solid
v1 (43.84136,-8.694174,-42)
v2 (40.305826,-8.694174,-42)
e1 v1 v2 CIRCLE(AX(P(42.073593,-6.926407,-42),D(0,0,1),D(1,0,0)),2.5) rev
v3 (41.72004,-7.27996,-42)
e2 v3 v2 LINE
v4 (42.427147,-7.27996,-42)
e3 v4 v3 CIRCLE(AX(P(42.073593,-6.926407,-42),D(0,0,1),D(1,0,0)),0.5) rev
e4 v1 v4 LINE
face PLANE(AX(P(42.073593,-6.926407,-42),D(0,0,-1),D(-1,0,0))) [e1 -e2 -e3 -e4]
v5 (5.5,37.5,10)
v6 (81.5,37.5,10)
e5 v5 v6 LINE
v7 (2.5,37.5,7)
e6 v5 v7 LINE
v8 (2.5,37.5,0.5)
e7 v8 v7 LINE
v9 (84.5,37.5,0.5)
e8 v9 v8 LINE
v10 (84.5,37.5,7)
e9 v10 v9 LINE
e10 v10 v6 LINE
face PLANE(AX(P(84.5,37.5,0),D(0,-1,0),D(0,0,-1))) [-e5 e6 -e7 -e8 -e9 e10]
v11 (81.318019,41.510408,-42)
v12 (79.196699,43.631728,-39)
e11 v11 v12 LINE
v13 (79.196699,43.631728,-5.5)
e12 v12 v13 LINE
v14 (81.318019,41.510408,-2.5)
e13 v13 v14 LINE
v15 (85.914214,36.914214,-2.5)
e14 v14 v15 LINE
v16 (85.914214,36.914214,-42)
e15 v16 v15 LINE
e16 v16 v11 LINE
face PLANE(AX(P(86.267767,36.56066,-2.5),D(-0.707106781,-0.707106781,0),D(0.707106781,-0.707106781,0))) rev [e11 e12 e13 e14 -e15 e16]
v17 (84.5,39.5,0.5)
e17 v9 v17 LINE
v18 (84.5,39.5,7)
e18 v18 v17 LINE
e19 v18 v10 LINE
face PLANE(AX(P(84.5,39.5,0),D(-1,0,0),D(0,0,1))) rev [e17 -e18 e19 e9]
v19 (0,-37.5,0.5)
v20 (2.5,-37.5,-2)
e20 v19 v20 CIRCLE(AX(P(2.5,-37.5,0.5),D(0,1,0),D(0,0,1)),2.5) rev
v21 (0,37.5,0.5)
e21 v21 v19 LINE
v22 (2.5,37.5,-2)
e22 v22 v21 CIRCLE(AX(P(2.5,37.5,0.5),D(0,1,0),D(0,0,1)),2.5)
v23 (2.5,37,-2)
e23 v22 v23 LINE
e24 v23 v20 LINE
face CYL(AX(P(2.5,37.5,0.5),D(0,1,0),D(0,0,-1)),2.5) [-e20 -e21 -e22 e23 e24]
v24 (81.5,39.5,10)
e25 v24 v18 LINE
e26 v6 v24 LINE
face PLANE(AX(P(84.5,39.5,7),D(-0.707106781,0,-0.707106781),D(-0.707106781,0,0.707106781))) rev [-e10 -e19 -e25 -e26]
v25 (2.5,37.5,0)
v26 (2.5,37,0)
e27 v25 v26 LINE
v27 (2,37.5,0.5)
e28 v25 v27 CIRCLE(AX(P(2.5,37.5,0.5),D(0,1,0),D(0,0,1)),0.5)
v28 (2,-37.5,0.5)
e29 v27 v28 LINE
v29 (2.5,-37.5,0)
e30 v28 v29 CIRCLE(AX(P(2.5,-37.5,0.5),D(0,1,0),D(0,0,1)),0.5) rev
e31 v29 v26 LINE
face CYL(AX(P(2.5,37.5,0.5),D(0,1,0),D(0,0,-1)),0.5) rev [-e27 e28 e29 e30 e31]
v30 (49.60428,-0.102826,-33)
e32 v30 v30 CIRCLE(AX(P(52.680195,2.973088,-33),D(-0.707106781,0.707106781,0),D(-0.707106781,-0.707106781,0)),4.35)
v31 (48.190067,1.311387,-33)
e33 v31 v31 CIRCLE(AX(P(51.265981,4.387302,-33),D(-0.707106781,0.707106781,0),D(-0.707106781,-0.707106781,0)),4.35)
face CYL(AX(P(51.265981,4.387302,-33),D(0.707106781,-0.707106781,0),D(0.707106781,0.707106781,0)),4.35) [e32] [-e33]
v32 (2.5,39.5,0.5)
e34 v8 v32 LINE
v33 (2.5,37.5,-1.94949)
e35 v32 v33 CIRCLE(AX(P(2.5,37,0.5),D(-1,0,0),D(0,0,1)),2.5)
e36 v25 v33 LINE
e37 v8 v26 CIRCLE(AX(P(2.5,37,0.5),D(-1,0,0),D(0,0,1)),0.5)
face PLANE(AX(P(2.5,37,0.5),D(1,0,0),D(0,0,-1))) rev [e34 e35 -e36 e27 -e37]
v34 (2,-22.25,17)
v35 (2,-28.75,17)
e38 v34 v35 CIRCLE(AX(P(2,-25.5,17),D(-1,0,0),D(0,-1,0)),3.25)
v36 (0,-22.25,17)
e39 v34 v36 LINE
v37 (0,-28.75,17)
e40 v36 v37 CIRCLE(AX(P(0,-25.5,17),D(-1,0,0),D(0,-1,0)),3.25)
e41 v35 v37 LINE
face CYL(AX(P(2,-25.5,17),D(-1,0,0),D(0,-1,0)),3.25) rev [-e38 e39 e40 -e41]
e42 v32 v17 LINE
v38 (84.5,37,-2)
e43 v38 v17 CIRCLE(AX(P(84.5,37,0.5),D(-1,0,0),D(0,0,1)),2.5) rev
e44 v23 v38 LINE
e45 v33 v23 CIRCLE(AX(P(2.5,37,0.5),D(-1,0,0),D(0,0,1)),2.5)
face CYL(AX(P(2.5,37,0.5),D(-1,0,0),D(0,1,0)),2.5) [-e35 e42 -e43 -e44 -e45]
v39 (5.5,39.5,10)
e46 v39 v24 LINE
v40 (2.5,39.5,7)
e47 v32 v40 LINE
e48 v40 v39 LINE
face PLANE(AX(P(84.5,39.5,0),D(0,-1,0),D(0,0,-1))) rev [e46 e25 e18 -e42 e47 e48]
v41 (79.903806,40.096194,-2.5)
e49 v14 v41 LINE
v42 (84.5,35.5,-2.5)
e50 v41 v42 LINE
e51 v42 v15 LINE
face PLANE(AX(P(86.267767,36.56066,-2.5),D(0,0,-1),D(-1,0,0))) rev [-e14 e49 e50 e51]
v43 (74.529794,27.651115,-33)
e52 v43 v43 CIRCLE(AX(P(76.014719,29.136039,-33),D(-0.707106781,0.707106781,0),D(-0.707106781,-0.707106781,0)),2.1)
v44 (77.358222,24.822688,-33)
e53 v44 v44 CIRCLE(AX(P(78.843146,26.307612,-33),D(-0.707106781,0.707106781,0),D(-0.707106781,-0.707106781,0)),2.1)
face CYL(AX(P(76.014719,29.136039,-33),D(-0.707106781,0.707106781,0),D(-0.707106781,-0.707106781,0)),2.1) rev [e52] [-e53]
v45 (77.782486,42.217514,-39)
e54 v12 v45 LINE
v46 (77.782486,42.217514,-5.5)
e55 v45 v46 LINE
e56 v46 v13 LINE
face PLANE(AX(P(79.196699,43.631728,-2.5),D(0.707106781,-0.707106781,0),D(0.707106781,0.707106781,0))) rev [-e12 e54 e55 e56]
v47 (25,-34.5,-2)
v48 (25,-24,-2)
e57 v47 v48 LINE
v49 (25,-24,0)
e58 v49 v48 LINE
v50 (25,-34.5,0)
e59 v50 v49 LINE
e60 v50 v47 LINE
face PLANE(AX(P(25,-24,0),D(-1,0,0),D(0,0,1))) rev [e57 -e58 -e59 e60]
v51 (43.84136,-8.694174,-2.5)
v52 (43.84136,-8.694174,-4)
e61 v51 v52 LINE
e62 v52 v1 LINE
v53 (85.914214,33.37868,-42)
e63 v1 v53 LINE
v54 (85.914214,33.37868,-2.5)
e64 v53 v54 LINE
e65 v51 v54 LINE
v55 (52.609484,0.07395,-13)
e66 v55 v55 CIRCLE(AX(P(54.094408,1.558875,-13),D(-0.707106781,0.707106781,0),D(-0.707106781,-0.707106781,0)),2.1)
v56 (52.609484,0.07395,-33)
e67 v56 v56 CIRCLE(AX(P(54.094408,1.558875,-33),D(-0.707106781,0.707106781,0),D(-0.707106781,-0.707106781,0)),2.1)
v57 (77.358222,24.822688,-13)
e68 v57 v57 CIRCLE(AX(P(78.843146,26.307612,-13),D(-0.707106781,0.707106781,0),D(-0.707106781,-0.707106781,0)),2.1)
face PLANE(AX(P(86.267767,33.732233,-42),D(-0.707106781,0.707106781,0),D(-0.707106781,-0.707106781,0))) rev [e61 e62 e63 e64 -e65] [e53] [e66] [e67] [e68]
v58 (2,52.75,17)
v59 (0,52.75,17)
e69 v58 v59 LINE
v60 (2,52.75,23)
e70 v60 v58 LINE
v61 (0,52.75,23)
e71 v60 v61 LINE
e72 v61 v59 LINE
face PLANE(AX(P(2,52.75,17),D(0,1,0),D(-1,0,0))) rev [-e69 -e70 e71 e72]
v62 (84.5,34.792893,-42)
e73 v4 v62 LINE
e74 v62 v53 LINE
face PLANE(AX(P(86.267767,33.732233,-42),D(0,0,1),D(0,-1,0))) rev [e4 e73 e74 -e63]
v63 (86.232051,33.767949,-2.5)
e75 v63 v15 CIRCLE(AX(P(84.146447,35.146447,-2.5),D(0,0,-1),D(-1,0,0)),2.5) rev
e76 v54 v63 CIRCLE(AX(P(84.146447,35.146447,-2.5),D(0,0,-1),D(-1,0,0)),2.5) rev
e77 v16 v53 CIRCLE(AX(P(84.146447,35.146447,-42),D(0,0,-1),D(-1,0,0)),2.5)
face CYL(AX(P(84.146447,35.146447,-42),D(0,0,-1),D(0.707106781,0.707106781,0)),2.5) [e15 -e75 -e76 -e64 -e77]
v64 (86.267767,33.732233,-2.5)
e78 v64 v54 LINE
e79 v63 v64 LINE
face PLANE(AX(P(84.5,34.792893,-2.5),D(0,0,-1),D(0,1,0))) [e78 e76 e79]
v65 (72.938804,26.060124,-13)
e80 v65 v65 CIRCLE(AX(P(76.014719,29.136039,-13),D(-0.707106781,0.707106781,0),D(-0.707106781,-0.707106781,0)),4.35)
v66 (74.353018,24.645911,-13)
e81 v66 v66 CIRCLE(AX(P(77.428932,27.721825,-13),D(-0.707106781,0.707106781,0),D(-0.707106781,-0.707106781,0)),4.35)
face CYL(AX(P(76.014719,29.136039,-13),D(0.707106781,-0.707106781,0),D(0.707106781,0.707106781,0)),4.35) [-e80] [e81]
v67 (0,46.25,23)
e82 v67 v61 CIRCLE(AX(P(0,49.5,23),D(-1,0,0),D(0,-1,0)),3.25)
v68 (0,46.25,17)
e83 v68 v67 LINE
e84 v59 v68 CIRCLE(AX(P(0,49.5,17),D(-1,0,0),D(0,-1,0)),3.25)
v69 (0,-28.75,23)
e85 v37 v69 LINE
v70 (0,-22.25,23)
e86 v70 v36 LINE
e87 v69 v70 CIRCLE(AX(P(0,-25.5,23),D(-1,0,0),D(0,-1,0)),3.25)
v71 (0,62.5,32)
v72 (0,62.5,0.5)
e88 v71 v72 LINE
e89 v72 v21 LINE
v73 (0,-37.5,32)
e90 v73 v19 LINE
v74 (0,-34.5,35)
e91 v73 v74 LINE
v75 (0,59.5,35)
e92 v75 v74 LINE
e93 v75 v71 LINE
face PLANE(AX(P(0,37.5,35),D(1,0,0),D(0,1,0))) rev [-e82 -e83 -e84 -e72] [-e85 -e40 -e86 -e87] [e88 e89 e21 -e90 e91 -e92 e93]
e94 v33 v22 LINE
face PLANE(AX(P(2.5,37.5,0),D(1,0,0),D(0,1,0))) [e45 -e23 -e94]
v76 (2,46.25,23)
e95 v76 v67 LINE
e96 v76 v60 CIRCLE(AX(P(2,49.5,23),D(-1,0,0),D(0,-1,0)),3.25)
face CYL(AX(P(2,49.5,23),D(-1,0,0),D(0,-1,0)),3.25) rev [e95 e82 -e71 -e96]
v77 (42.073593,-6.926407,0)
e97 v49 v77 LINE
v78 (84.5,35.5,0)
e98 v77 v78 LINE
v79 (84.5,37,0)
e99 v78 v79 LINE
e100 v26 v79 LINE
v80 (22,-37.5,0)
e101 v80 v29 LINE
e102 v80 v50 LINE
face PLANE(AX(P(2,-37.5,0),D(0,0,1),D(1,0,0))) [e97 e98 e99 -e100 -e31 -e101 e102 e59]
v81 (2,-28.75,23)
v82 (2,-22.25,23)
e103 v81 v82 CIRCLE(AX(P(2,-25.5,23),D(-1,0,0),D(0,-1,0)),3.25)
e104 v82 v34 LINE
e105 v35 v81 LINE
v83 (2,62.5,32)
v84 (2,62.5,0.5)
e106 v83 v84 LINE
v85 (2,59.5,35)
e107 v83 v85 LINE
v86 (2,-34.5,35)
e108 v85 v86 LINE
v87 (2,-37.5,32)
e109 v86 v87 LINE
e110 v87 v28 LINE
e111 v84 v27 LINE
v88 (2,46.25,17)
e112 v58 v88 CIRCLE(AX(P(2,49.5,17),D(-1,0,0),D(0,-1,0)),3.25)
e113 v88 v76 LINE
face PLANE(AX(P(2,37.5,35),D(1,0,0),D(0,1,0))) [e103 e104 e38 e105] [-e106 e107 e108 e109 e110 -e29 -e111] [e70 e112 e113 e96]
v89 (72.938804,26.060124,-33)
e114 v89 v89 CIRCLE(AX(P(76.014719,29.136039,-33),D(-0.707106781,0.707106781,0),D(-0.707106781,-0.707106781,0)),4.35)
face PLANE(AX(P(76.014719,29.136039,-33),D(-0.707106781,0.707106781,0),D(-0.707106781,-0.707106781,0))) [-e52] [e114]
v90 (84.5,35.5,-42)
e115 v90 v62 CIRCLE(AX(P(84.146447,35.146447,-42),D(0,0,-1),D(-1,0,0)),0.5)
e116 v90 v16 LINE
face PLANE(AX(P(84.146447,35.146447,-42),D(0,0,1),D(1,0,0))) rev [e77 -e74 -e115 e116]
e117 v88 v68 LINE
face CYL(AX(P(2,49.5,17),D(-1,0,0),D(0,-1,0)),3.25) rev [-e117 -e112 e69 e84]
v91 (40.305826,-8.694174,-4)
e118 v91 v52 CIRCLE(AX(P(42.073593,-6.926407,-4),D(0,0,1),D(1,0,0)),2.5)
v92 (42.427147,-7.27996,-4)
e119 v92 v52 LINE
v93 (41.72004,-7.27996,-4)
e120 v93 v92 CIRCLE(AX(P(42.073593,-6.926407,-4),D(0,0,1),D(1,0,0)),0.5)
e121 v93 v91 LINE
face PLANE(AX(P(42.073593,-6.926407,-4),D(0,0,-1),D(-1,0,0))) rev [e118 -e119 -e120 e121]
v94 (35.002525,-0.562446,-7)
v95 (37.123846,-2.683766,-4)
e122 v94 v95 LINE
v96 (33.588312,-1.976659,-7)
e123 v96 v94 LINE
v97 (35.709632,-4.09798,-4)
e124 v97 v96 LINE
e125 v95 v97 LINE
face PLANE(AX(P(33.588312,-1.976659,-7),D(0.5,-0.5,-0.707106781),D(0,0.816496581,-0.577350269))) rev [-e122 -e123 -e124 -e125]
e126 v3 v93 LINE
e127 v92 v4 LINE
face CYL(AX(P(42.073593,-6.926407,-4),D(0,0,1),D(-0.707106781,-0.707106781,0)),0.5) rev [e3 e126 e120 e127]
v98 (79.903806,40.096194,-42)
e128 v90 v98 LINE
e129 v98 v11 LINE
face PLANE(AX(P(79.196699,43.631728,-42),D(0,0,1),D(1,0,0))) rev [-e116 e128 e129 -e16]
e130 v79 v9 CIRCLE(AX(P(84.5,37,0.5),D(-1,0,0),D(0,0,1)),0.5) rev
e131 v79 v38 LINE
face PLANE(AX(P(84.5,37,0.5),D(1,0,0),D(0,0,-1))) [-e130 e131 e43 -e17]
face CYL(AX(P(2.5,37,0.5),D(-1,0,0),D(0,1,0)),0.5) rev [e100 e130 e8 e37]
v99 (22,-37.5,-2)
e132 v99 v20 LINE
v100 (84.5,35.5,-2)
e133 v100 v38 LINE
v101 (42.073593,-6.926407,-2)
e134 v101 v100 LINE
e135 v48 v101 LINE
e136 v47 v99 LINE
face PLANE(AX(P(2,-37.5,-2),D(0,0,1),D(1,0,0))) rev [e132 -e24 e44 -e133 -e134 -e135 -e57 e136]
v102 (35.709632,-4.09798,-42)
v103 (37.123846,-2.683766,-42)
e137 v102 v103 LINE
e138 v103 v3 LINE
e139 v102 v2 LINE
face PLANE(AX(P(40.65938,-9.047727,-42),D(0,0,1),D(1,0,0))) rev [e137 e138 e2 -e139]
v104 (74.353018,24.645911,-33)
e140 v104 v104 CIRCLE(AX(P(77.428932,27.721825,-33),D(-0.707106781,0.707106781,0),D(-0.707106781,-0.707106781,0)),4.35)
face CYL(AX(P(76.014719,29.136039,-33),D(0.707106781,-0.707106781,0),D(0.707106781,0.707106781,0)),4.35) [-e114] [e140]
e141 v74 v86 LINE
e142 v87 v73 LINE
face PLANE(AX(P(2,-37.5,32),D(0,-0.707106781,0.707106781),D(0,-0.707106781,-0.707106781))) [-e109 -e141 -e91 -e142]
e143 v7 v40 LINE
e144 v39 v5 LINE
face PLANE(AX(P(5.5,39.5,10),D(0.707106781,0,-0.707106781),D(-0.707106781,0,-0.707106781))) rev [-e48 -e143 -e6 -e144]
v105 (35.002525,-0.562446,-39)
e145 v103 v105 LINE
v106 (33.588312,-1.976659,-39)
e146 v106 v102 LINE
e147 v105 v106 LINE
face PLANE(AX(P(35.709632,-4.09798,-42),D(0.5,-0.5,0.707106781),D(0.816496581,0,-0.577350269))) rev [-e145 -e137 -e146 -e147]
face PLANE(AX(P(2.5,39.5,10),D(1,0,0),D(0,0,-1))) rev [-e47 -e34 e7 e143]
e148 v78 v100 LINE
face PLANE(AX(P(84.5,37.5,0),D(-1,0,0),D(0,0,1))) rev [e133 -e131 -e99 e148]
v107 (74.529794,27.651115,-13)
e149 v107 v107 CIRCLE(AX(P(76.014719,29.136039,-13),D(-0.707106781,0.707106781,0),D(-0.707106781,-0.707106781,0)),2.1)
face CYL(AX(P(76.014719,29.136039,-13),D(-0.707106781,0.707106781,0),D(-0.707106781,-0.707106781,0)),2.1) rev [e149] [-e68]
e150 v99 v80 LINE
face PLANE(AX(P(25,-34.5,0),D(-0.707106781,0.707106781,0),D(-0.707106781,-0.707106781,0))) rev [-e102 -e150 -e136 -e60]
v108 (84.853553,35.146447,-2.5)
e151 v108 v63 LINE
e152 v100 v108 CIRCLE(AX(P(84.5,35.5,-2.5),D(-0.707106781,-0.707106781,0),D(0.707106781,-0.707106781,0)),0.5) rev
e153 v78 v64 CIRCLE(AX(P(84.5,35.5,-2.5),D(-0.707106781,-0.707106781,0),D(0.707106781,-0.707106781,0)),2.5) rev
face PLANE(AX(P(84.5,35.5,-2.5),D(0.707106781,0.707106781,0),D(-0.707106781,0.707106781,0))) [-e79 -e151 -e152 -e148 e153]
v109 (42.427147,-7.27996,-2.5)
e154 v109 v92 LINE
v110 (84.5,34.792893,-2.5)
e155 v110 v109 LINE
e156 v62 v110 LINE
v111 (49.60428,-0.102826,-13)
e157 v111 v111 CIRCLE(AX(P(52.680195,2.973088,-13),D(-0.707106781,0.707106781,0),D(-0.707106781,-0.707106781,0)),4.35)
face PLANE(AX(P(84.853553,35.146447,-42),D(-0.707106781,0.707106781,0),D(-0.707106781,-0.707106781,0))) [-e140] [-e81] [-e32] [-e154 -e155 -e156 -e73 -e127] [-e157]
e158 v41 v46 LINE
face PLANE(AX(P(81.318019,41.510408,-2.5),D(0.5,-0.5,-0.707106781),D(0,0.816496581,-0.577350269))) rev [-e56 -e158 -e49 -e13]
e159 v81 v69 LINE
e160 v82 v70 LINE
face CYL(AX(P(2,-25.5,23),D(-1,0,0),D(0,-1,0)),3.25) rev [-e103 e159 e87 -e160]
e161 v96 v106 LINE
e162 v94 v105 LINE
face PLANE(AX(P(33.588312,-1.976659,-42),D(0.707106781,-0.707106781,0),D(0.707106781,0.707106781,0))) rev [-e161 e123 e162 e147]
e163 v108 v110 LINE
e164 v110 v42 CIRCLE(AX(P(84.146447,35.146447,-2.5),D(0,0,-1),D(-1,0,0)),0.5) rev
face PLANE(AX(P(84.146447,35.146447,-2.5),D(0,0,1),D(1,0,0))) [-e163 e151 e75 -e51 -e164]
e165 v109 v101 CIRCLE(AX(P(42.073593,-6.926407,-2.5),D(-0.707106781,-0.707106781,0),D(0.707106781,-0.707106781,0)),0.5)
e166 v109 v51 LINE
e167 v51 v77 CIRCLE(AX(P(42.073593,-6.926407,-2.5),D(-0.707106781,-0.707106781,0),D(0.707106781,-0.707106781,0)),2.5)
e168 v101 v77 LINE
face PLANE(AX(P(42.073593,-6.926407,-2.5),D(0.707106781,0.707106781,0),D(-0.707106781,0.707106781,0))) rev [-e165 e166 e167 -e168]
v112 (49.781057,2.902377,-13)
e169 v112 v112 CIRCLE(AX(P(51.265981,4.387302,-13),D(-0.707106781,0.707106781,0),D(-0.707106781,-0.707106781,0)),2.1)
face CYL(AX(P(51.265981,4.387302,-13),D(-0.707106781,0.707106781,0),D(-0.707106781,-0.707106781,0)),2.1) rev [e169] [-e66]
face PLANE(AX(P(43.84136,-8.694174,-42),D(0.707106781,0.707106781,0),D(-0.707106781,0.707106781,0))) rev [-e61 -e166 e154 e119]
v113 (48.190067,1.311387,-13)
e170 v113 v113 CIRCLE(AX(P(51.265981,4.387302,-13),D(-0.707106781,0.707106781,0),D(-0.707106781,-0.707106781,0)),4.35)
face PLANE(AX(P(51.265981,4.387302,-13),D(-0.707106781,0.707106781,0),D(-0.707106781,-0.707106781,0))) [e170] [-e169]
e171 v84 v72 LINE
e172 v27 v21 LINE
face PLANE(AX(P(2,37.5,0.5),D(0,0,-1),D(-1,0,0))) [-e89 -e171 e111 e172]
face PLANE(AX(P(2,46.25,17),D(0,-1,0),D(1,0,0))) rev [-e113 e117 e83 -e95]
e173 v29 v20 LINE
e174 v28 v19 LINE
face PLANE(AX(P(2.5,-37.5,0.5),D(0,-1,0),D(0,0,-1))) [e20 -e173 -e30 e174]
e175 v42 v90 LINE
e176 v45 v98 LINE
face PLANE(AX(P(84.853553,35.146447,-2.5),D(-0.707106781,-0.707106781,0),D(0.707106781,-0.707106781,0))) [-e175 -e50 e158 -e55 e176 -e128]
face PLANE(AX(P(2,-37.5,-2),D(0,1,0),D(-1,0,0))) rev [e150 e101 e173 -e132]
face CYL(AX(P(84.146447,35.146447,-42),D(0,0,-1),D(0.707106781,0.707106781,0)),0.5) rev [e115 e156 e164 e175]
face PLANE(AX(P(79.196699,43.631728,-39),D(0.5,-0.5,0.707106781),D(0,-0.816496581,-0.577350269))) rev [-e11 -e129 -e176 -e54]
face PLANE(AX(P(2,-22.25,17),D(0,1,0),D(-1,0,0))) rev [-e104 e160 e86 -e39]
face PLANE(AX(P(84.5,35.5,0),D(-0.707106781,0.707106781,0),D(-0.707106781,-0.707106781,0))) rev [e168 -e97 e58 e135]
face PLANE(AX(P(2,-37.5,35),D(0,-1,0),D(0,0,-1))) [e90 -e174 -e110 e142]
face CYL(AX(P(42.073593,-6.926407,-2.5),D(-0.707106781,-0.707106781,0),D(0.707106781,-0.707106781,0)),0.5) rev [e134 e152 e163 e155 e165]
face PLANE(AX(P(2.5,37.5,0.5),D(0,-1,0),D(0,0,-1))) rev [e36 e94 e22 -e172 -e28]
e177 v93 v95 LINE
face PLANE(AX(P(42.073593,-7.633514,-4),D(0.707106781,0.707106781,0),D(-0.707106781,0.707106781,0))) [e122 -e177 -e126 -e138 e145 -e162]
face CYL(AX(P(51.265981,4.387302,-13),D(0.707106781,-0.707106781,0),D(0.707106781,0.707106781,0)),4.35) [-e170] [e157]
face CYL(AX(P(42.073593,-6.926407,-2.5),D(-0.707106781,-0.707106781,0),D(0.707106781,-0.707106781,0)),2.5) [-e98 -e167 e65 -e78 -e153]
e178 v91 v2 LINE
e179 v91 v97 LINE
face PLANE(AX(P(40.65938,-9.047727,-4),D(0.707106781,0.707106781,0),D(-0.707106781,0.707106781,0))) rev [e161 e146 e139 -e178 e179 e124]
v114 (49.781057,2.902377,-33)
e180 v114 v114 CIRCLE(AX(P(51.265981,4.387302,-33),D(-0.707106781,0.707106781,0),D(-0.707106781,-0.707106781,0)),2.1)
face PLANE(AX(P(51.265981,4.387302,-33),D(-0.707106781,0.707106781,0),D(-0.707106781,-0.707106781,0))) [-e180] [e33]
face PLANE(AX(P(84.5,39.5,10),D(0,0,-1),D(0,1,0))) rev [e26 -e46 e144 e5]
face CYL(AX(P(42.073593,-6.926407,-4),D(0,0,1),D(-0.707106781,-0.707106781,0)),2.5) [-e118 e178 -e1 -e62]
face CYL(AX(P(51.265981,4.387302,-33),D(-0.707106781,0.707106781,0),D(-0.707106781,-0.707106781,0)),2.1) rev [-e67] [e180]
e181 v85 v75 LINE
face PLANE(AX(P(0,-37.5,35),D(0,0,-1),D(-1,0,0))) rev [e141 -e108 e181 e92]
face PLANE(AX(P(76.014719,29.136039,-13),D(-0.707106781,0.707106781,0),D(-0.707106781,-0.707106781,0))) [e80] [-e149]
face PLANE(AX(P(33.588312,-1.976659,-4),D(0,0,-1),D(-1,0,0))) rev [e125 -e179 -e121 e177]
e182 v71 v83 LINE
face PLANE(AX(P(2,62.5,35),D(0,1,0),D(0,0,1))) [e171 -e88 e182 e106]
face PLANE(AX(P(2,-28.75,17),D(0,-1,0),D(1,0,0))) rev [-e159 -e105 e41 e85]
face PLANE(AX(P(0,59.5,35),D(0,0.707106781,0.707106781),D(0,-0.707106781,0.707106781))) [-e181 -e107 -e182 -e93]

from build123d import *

# Parameters (mm, degrees)
SKETCH_1_W                       = 2
SKETCH_1_H                       = 75
SM_BASE_FLANGE_1_DEPTH           = 35
SM_EDGE_FLANGE_1_STRIP_W         = 9
SM_EDGE_FLANGE_1_STRIP_H         = 2
SM_EDGE_FLANGE_1_STRIP_CUT_DEPTH = 75
SM_EDGE_FLANGE_1_DEPTH           = 75
CUT_EXTRUDE_1_DEPTH              = 2
SM_EDGE_FLANGE_2_DEPTH           = 60
SM_EDGE_FLANGE_3_STRIP_W         = 9
SM_EDGE_FLANGE_3_STRIP_H         = 2
SM_EDGE_FLANGE_3_STRIP_CUT_DEPTH = 39.5
SM_EDGE_FLANGE_3_DEPTH           = 39.5
SM_EDGE_FLANGE_4_STRIP_W         = 9
SM_EDGE_FLANGE_4_STRIP_H         = 2
SM_EDGE_FLANGE_4_STRIP_CUT_DEPTH = 82
SM_EDGE_FLANGE_4_DEPTH           = 82
SM_EDGE_FLANGE_5_DEPTH           = 38
SKETCH_18_R                      = 4.35
EXTRUDE_1_DEPTH                  = 2
HOLE_WIZARD_M5_1_D               = 4.2
HOLE_WIZARD_M5_1_DEPTH           = 33.751449569
PATTERN_LINEAR_1_COUNT           = 2
PATTERN_LINEAR_1_PITCH           = 20
PATTERN_LINEAR_1_COUNT_DIR2      = 2
PATTERN_LINEAR_1_PITCH_DIR2      = 35
SKETCH_26_W                      = 34.5
SKETCH_26_H                      = 25
SM_BASE_FLANGE_1_2_DEPTH         = 2
CUT_EXTRUDE_2_DEPTH              = 2
CHAMFER_1_SIZE                   = 3


# Sheet-metal steps are written as plain solids
with BuildPart() as part:
    # Sketch 1 → Sm Base Flange 1 (new body)
    with BuildSketch(Plane.XY):
        with Locations((1, 0)):
            Rectangle(SKETCH_1_W, SKETCH_1_H)
    extrude(amount=SM_BASE_FLANGE_1_DEPTH)

    # 边线-法兰1 strip (across the edge) → 边线-法兰1 strip cut (cut)
    with BuildSketch(Plane(origin=(2, -37.5, 0), x_dir=(0, 0, 1), z_dir=(0, 1, 0))):
        with Locations((-4, -1)):
            Rectangle(SM_EDGE_FLANGE_1_STRIP_W, SM_EDGE_FLANGE_1_STRIP_H)
    extrude(amount=SM_EDGE_FLANGE_1_STRIP_CUT_DEPTH, mode=Mode.SUBTRACT)

    # 边线-法兰1 section (across the edge) → 边线-法兰1 (add)
    with BuildSketch(Plane(origin=(2, -37.5, 0), x_dir=(0, 0, 1), z_dir=(0, 1, 0))):
        with BuildLine():
            Line((-2, 0.5), (-2, 84))
            Line((-2, 84), (0, 84))
            Line((0, 84), (0, 0.5))
            ThreePointArc((0, 0.5), (0.146446609, 0.146446609), (0.5, 0))
            Line((0.5, 0), (0.5, -2))
            ThreePointArc((0.5, -2), (-1.267766953, -1.267766953), (-2, 0.5))
        make_face()
    extrude(amount=SM_EDGE_FLANGE_1_DEPTH)

    # 草图6 → 切除-拉伸1 (cut)
    with BuildSketch(Plane(origin=(0, 0, -2), x_dir=(-1, 0, 0), z_dir=(0, 0, -1))):
        Polygon((-84.5, 35.5), (-25, -24), (-25, -37.5), (-86, -37.5), (-86, 37.5), (-84.5, 37.5), align=None)
    extrude(amount=-CUT_EXTRUDE_1_DEPTH, mode=Mode.SUBTRACT)

    # 边线-法兰2 section (across the edge) → 边线-法兰2 (add)
    with BuildSketch(Plane(origin=(84.853553391, 35.146446609, -2), x_dir=(-0.7071067811865437, 0.7071067811865513, -1.0226318000689522e-15), z_dir=(-0.7071067811865513, -0.7071067811865437, 2.468731249046521e-15))):
        with BuildLine():
            Line((-2, 0.5), (-2, 40))
            Line((-2, 40), (0, 40))
            Line((0, 40), (0, 0.5))
            ThreePointArc((0, 0.5), (0.146446609, 0.146446609), (0.5, 0))
            Line((0.5, 0), (0.5, -2))
            ThreePointArc((0.5, -2), (-1.267766953, -1.267766953), (-2, 0.5))
        make_face()
    extrude(amount=SM_EDGE_FLANGE_2_DEPTH)

    # 边线-法兰3 strip (across the edge) → 边线-法兰3 strip cut (cut)
    with BuildSketch(Plane(origin=(84.853553391, 35.146446609, -2.5), x_dir=(-0.7071067811865538, -0.7071067811865412, 2.111674983989249e-15), z_dir=(0, 0, -1))):
        with Locations((-4, -1)):
            Rectangle(SM_EDGE_FLANGE_3_STRIP_W, SM_EDGE_FLANGE_3_STRIP_H)
    extrude(amount=SM_EDGE_FLANGE_3_STRIP_CUT_DEPTH, mode=Mode.SUBTRACT)

    # 边线-法兰3 section (across the edge) → 边线-法兰3 (add)
    with BuildSketch(Plane(origin=(84.853553391, 35.146446609, -2.5), x_dir=(-0.7071067811865538, -0.7071067811865412, 2.111674983989249e-15), z_dir=(0, 0, -1))):
        with BuildLine():
            Line((-2, 0.5), (-2, 10))
            Line((-2, 10), (0, 10))
            Line((0, 10), (0, 0.5))
            ThreePointArc((0, 0.5), (0.146446609, 0.146446609), (0.5, 0))
            Line((0.5, 0), (0.5, -2))
            ThreePointArc((0.5, -2), (-1.267766953, -1.267766953), (-2, 0.5))
        make_face()
    extrude(amount=SM_EDGE_FLANGE_3_DEPTH)

    # 边线-法兰4 strip (across the edge) → 边线-法兰4 strip cut (cut)
    with BuildSketch(Plane(origin=(84.5, 37.5, 0), x_dir=(0, -1, 0), z_dir=(-1, 0, 0))):
        with Locations((-4, -1)):
            Rectangle(SM_EDGE_FLANGE_4_STRIP_W, SM_EDGE_FLANGE_4_STRIP_H)
    extrude(amount=SM_EDGE_FLANGE_4_STRIP_CUT_DEPTH, mode=Mode.SUBTRACT)

    # 边线-法兰4 section (across the edge) → 边线-法兰4 (add)
    with BuildSketch(Plane(origin=(84.5, 37.5, 0), x_dir=(0, -1, 0), z_dir=(-1, 0, 0))):
        with BuildLine():
            Line((-2, 0.5), (-2, 10))
            Line((-2, 10), (0, 10))
            Line((0, 10), (0, 0.5))
            ThreePointArc((0, 0.5), (0.146446609, 0.146446609), (0.5, 0))
            Line((0.5, 0), (0.5, -2))
            ThreePointArc((0.5, -2), (-1.267766953, -1.267766953), (-2, 0.5))
        make_face()
    extrude(amount=SM_EDGE_FLANGE_4_DEPTH)

    # 边线-法兰5 section (across the edge) → 边线-法兰5 (add)
    with BuildSketch(Plane(origin=(42.073593129, -7.633513652, -42), x_dir=(0.7071067811865489, 0.7071067811865461, -2.23589115951803e-15), z_dir=(0, 0, 1))):
        with BuildLine():
            Line((-2, 0.5), (-2, 10))
            Line((-2, 10), (0, 10))
            Line((0, 10), (0, 0.5))
            ThreePointArc((0, 0.5), (0.146446609, 0.146446609), (0.5, 0))
            Line((0.5, 0), (0.5, -2))
            ThreePointArc((0.5, -2), (-1.267766953, -1.267766953), (-2, 0.5))
        make_face()
    extrude(amount=SM_EDGE_FLANGE_5_DEPTH)

    # 草图18 → 凸台-拉伸1 (add)
    with BuildSketch(Plane(origin=(24.853553391, -24.853553391, 0), x_dir=(0, 0, 1), z_dir=(-0.7071067811865436, 0.7071067811865515, -1.027306589177874e-15))):
        with Locations(Location((-33, 74.352813742, 0), (0, 0, 270))):
            Circle(SKETCH_18_R)
    extrude_1 = extrude(amount=EXTRUDE_1_DEPTH)

    # M5 螺纹孔1
    with Locations(Plane(origin=(23.439339828, -23.439339828, 0), x_dir=(-0.7071067811865515, -0.7071067811865436, 1.0273065891778625e-15), z_dir=(-0.7071067811865436, 0.7071067811865515, -1.027306589177874e-15))):
        with Locations((-74.352813742, -33)):
            hole_wizard_m5_1 = Hole(HOLE_WIZARD_M5_1_D / 2, depth=HOLE_WIZARD_M5_1_DEPTH)

    # 阵列(线性)1: 凸台-拉伸1, Hole Wizard M5 _1 2 × 2
    with Locations(*[Vector(0, 0, 1) * (i * PATTERN_LINEAR_1_PITCH) + Vector(-0.7071067811865475, -0.7071067811865477, 1.982541115402065e-15) * (j * PATTERN_LINEAR_1_PITCH_DIR2) for i in range(PATTERN_LINEAR_1_COUNT) for j in range(PATTERN_LINEAR_1_COUNT_DIR2) if (i, j) != (0, 0)]):
        add(extrude_1)
        add(hole_wizard_m5_1, mode=Mode.SUBTRACT)

    # 草图26 → Sm Base Flange 1 2 (add)
    with BuildSketch(Plane.ZY):
        with Locations((17.75, 50)):
            Rectangle(SKETCH_26_W, SKETCH_26_H)
    extrude(amount=-SM_BASE_FLANGE_1_2_DEPTH)

    # 草图16 → 切除-拉伸2 (cut)
    with BuildSketch(Plane.ZY):
        with BuildLine():
            Line((17, -22.25), (23, -22.25))
            ThreePointArc((23, -22.25), (26.25, -25.5), (23, -28.75))
            Line((23, -28.75), (17, -28.75))
            ThreePointArc((17, -28.75), (13.75, -25.5), (17, -22.25))
        make_face()
        with BuildLine():
            Line((17, 52.75), (23, 52.75))
            ThreePointArc((23, 52.75), (26.25, 49.5), (23, 46.25))
            Line((23, 46.25), (17, 46.25))
            ThreePointArc((17, 46.25), (13.75, 49.5), (17, 52.75))
        make_face()
    extrude(amount=-CUT_EXTRUDE_2_DEPTH, mode=Mode.SUBTRACT)

    # 倒角1
    chamfer_1_edges = [part.edges().sort_by_distance(p)[0] for p in [
        (78.48959236, 42.924621202, -2.5),
        (78.48959236, 42.924621202, -42),
        (84.5, 38.5, 10),
        (2.5, 38.5, 10),
        (34.295418536, -1.269552622, -42),
        (34.295418536, -1.269552622, -4),
        (1, 62.5, 35),
        (25, -37.5, -1),
        (1, -37.5, 35),
    ]]
    chamfer(chamfer_1_edges, length=CHAMFER_1_SIZE)


solid = part.part
